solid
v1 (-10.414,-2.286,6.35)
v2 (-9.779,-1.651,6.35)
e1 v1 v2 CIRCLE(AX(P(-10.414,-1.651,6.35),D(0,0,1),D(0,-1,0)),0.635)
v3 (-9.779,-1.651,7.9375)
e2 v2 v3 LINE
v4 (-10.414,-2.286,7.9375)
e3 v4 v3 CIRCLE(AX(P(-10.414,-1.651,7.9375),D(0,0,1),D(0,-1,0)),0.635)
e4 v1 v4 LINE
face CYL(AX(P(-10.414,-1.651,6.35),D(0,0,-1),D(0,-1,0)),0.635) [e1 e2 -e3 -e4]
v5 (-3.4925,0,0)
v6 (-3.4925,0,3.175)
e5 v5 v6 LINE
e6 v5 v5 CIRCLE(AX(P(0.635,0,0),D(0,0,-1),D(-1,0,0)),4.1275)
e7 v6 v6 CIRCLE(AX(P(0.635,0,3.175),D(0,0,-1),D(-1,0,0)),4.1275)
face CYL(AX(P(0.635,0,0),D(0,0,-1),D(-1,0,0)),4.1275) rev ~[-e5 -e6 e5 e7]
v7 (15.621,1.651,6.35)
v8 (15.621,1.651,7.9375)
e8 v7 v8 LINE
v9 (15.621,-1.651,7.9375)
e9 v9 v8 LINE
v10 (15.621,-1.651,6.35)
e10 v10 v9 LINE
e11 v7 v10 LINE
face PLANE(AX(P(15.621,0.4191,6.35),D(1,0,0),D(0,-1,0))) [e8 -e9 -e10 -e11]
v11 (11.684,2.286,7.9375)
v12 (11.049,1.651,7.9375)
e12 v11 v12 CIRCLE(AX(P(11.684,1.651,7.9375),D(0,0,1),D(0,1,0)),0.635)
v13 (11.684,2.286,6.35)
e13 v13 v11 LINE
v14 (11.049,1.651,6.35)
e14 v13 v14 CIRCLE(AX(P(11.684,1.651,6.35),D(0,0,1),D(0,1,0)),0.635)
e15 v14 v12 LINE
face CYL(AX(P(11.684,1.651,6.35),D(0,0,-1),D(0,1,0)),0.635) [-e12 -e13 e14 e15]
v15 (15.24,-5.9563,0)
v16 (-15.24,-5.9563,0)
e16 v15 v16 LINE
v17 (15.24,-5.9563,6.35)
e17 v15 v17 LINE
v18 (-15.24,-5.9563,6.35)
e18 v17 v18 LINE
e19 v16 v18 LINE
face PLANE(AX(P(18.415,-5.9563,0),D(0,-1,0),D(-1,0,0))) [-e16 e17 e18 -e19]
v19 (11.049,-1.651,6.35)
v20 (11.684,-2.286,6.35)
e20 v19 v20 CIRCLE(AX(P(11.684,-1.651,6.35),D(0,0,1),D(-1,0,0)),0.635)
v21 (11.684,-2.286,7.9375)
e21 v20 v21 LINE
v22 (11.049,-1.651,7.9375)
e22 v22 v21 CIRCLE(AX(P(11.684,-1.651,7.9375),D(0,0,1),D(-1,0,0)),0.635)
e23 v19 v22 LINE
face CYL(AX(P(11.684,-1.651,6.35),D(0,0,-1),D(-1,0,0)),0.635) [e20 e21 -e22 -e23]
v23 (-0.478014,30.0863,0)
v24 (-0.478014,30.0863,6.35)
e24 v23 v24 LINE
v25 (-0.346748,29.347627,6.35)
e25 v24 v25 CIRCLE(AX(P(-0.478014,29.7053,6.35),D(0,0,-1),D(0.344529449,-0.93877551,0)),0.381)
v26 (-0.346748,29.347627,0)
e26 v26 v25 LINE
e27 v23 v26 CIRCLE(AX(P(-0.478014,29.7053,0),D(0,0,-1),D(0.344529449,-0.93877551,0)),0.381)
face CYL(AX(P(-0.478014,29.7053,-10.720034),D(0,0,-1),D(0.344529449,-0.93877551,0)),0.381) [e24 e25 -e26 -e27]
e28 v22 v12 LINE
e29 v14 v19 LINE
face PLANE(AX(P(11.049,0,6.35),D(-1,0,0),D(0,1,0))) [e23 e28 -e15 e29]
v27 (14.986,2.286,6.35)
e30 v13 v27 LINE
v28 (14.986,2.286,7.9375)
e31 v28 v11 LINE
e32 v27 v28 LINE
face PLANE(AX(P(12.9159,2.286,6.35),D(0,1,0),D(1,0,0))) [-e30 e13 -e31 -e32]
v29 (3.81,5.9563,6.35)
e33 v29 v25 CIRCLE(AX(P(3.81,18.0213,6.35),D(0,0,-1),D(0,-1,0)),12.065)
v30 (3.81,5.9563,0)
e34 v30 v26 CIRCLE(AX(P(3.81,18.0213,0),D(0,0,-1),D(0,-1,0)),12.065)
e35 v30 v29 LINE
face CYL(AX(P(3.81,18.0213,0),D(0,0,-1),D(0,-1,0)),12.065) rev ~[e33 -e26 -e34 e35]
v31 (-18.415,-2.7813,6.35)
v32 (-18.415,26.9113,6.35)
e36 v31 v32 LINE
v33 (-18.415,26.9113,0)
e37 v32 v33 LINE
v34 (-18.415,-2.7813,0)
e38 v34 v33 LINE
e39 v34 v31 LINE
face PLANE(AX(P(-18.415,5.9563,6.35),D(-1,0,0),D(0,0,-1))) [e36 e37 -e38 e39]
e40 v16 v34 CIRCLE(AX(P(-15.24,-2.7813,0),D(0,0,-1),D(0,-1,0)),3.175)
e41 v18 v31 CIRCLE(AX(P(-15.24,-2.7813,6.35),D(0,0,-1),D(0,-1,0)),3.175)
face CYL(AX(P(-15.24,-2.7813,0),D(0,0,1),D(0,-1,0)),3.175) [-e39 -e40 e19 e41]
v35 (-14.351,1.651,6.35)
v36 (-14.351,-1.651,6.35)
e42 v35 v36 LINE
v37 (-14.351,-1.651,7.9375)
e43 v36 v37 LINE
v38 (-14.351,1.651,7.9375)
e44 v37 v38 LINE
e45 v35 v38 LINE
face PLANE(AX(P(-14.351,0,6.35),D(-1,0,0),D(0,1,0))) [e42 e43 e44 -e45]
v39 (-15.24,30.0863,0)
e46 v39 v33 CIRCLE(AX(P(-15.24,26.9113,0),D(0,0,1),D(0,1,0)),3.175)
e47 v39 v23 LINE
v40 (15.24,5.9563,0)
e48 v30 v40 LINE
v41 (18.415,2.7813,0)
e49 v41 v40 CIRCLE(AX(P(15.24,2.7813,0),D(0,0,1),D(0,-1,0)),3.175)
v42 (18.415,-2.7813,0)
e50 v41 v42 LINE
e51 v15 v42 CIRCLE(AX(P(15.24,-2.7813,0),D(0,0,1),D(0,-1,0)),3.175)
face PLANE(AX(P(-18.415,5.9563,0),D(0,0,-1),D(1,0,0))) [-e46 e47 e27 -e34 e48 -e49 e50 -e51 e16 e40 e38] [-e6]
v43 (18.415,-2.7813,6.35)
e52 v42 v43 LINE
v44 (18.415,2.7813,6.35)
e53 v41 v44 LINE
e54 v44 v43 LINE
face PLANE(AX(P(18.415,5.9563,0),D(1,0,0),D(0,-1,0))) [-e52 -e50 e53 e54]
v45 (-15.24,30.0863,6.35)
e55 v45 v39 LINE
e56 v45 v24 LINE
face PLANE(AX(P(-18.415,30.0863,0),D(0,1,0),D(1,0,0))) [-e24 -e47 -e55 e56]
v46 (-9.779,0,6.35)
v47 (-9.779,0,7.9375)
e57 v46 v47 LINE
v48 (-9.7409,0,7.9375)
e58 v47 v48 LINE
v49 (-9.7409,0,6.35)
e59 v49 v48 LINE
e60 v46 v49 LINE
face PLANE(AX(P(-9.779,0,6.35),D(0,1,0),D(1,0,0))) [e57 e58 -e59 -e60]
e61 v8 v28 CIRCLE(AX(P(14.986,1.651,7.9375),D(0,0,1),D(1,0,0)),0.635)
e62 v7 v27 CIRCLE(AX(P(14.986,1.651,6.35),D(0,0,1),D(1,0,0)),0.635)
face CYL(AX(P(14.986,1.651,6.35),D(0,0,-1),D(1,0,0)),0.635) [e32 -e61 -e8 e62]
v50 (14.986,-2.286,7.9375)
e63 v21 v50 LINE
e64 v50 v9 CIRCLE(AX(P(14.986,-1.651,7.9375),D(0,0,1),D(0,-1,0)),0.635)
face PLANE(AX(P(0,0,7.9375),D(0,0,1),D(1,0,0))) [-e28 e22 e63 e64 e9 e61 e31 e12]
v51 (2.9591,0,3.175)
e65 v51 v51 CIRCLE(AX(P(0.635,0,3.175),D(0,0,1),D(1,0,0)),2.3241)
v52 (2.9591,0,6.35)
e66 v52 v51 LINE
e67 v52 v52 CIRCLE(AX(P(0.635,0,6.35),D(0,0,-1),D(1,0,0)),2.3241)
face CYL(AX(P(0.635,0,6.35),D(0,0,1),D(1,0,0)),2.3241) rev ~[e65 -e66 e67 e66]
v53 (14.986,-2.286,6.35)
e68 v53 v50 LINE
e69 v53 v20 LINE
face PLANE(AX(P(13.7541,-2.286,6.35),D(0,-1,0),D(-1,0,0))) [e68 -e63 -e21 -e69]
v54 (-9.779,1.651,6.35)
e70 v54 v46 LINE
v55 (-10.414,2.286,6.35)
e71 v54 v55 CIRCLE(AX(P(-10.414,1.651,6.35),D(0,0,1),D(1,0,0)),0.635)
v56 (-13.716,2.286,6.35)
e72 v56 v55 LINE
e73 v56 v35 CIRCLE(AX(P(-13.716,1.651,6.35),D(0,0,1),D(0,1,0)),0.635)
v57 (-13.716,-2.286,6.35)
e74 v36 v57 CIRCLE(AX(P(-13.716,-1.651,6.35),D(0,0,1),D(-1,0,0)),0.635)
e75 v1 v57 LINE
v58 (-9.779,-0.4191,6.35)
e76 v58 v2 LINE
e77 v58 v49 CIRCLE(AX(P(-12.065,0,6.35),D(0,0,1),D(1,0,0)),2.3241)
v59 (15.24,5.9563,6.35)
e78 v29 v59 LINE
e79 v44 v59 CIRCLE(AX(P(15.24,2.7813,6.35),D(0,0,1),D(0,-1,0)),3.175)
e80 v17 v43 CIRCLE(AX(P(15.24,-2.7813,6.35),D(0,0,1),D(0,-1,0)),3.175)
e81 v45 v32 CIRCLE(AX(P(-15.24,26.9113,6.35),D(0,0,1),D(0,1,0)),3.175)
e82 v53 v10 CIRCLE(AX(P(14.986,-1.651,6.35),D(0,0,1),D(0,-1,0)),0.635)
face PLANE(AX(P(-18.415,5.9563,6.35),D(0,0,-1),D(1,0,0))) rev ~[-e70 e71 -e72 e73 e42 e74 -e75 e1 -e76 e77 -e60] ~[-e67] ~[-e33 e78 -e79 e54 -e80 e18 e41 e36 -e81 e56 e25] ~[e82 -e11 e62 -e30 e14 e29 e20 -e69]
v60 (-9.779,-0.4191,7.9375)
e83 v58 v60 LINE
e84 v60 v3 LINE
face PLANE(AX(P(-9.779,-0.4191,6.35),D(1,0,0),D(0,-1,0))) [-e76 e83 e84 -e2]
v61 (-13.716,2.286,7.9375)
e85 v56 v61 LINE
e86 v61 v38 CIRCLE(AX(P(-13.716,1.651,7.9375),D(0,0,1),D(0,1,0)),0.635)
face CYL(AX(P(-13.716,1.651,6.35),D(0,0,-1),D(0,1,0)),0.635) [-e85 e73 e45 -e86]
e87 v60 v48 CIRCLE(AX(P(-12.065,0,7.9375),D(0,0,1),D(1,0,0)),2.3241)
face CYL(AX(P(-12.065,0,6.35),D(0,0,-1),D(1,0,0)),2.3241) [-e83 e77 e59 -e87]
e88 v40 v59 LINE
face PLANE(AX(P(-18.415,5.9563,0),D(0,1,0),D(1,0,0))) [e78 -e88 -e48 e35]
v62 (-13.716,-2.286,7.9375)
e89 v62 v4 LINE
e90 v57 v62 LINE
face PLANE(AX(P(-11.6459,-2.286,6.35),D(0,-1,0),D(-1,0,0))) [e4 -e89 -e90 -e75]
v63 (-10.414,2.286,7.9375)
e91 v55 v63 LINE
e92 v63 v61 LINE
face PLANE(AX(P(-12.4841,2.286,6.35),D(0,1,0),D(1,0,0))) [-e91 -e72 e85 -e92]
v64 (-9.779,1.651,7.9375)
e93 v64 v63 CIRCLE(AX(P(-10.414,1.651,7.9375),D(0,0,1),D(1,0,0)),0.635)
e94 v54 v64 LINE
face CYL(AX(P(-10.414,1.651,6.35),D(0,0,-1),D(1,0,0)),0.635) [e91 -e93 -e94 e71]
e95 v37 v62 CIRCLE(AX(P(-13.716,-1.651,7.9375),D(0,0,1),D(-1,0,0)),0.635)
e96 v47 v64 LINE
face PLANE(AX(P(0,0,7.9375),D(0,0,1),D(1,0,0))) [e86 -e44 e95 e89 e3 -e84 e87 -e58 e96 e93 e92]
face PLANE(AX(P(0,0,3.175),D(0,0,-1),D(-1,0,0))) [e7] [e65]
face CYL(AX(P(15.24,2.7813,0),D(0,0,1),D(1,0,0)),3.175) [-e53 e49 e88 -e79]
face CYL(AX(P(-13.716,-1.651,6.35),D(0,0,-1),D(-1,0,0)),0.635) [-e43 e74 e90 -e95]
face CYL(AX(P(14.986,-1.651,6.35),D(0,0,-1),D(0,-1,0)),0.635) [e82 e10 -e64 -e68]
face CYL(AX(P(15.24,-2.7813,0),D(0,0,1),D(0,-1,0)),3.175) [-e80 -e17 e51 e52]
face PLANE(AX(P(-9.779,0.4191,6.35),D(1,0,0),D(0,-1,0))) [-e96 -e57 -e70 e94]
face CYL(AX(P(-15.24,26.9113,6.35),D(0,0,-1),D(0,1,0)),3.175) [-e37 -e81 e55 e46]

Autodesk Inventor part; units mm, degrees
ref_plane "YZ Plane" through (0, 0, 0) normal (1, 0, 0) x (0, 1, 0)
ref_plane "XZ Plane" through (0, 0, 0) normal (0, 1, 0) x (-1, 0, 0)
ref_plane "XY Plane" through (0, 0, 0) normal (0, 0, 1) x (1, 0, 0)
sketch "Sketch1" plane through (0, 0, 0) normal (0, 0, 1) x (1, 0, 0)
  line L0 (-18.415, 5.9563) -> (18.415, 5.9563)
  line L1 (18.415, 5.9563) -> (18.415, -5.9563)
  line L2 (18.415, -5.9563) -> (-18.415, -5.9563)
  line L3 (-18.415, -5.9563) -> (-18.415, 5.9563)
  line L4 (-18.415, 5.9563) -> (18.415, -5.9563) construction
  line L5 (18.415, 5.9563) -> (-18.415, -5.9563) construction
  point P0 (0, 0)
  dimension "d0" = 36.83
  dimension "d1" = 11.9126
extrude "Extrusion1" add sketch "Sketch1" along normal blind 6.35
sketch "Sketch2" plane through (0, 0, 6.35) normal (0, 0, 1) x (1, 0, 0)
  line L0 (-18.415, 5.9563) -> (-18.415, -5.9563) projected
  line L1 (-18.415, 0) -> (18.415, 0)
  line L2 (18.415, -5.9563) -> (18.415, 5.9563) projected
  line L3 (-18.415, 0) -> (-20.6375, 0)
  line L4 (-18.415, 0) -> (-12.065, 0)
  circle A0 centre (-12.065, 0) radius 2.3241
  circle A1 centre (0.635, 0) radius 2.3241
  circle A2 centre (13.335, 0) radius 2.3241
  line L5 (-13.716, 2.286) -> (-10.414, 2.286)
  line L6 (-9.779, 1.651) -> (-9.779, -1.651)
  line L7 (-10.414, -2.286) -> (-13.716, -2.286)
  line L8 (-14.351, -1.651) -> (-14.351, 1.651)
  line L9 (-14.351, 2.286) -> (-9.779, -2.286) construction
  line L10 (-9.779, 2.286) -> (-14.351, -2.286) construction
  line L11 (11.684, 2.286) -> (14.986, 2.286)
  line L12 (15.621, 1.651) -> (15.621, -1.651)
  line L13 (14.986, -2.286) -> (11.684, -2.286)
  line L14 (11.049, -1.651) -> (11.049, 1.651)
  line L15 (11.049, 2.286) -> (15.621, -2.286) construction
  line L16 (15.621, 2.286) -> (11.049, -2.286) construction
  arc A3 (-13.716, 2.286) -> (-14.351, 1.651) centre (-13.716, 1.651) ccw
  arc A4 (-9.779, 1.651) -> (-10.414, 2.286) centre (-10.414, 1.651) ccw
  arc A5 (-10.414, -2.286) -> (-9.779, -1.651) centre (-10.414, -1.651) ccw
  arc A6 (-14.351, -1.651) -> (-13.716, -2.286) centre (-13.716, -1.651) ccw
  arc A7 (11.684, 2.286) -> (11.049, 1.651) centre (11.684, 1.651) ccw
  arc A8 (15.621, 1.651) -> (14.986, 2.286) centre (14.986, 1.651) ccw
  arc A9 (14.986, -2.286) -> (15.621, -1.651) centre (14.986, -1.651) ccw
  arc A10 (11.049, -1.651) -> (11.684, -2.286) centre (11.684, -1.651) ccw
  point P0 (0, 0)
  point P1 (-9.779, -0.4191)
  point P2 (-9.7409, 0)
  point P3 (-9.779, 0)
  dimension "d5" = 6.35
  dimension "d6" = 4.6482
  dimension "d9" = 12.7
  dimension "d16" = 4.572
  dimension "d17" = 4.572
  dimension "d18" = 4.572
  dimension "d19" = 4.572
  dimension "d20" = 0.635
extrude "Extrusion2" add sketch "Sketch2" along normal blind 1.5875 contours L8 A0 L5 L6 L1 | L1 L6 A0 L7 L8 | L8 A3 L5 A0 | A0 L7 A6 L8 | L1 A0 L6 | L5 A4 L6 A0 | A0 L6 A5 L7 | L14 A2 L11 L12 L1 | L1 L12 A2 L13 L14 | L14 A7 L11 A2 | A2 L13 A10 L14 | A2 L11 A8 L12 | L12 A9 L13 A2 picked at (-9.772, -0.2331)
extrude "Extrusion3" cut sketch "Sketch2" against normal through all contours A1 L1 | L1 A1
sketch "Sketch9" plane through (-18.415, 5.9563, 0) normal (0, 1, 0) x (1, 0, 0)
  line L0 (0, 0) -> (36.83, 0) projected
  line L1 (0, -6.35) -> (36.83, -6.35) projected
  line L2 (0, 0) -> (22.225, 0)
  line L3 (22.225, 0) -> (22.225, -6.35)
  line L4 (22.225, -6.35) -> (0, -6.35)
  line L5 (0, -6.35) -> (0, 0)
  point P0 (18.415, 0)
  dimension "d45" = 22.225
extrude "Extrusion9" add sketch "Sketch9" along normal blind 24.13
sketch "Sketch10" plane through (0, 0, 0) normal (0, 0, -1) x (-1, 0, 0)
  line L0 (-18.415, 5.9563) -> (-3.81, 5.9563) projected
  line L1 (18.415, 30.0863) -> (-3.81, 30.0863) projected
  arc A0 (-3.81, 5.9563) -> (-3.81, 30.0863) centre (-3.81, 18.0213) ccw
  line L2 (-3.81, 30.0863) -> (-3.81, 5.9563)
  point P0 (0, 0)
extrude "Extrusion10" cut sketch "Sketch10" against normal blind 19.05
fillet "Fillet7" radius 0.381 1 edges at (3.81, 30.0863, 3.175)
fillet "Fillet8" radius 3.175 4 edges at (-18.415, 30.0863, 3.175) (18.415, 5.9563, 3.175) (18.415, -5.9563, 3.175) (-18.415, -5.9563, 3.175)
sketch "Sketch11" plane through (0, 0, 0) normal (0, 0, -1) x (-1, 0, 0)
  circle A0 centre (-0.635, 0) radius 2.3241 projected
  circle A1 centre (-0.635, 0) radius 4.1275
  point P0 (0, 0)
  dimension "d52" = 8.255
extrude "Extrusion11" cut sketch "Sketch11" against normal blind 3.175
properties part number "piston holder for goal rush"
